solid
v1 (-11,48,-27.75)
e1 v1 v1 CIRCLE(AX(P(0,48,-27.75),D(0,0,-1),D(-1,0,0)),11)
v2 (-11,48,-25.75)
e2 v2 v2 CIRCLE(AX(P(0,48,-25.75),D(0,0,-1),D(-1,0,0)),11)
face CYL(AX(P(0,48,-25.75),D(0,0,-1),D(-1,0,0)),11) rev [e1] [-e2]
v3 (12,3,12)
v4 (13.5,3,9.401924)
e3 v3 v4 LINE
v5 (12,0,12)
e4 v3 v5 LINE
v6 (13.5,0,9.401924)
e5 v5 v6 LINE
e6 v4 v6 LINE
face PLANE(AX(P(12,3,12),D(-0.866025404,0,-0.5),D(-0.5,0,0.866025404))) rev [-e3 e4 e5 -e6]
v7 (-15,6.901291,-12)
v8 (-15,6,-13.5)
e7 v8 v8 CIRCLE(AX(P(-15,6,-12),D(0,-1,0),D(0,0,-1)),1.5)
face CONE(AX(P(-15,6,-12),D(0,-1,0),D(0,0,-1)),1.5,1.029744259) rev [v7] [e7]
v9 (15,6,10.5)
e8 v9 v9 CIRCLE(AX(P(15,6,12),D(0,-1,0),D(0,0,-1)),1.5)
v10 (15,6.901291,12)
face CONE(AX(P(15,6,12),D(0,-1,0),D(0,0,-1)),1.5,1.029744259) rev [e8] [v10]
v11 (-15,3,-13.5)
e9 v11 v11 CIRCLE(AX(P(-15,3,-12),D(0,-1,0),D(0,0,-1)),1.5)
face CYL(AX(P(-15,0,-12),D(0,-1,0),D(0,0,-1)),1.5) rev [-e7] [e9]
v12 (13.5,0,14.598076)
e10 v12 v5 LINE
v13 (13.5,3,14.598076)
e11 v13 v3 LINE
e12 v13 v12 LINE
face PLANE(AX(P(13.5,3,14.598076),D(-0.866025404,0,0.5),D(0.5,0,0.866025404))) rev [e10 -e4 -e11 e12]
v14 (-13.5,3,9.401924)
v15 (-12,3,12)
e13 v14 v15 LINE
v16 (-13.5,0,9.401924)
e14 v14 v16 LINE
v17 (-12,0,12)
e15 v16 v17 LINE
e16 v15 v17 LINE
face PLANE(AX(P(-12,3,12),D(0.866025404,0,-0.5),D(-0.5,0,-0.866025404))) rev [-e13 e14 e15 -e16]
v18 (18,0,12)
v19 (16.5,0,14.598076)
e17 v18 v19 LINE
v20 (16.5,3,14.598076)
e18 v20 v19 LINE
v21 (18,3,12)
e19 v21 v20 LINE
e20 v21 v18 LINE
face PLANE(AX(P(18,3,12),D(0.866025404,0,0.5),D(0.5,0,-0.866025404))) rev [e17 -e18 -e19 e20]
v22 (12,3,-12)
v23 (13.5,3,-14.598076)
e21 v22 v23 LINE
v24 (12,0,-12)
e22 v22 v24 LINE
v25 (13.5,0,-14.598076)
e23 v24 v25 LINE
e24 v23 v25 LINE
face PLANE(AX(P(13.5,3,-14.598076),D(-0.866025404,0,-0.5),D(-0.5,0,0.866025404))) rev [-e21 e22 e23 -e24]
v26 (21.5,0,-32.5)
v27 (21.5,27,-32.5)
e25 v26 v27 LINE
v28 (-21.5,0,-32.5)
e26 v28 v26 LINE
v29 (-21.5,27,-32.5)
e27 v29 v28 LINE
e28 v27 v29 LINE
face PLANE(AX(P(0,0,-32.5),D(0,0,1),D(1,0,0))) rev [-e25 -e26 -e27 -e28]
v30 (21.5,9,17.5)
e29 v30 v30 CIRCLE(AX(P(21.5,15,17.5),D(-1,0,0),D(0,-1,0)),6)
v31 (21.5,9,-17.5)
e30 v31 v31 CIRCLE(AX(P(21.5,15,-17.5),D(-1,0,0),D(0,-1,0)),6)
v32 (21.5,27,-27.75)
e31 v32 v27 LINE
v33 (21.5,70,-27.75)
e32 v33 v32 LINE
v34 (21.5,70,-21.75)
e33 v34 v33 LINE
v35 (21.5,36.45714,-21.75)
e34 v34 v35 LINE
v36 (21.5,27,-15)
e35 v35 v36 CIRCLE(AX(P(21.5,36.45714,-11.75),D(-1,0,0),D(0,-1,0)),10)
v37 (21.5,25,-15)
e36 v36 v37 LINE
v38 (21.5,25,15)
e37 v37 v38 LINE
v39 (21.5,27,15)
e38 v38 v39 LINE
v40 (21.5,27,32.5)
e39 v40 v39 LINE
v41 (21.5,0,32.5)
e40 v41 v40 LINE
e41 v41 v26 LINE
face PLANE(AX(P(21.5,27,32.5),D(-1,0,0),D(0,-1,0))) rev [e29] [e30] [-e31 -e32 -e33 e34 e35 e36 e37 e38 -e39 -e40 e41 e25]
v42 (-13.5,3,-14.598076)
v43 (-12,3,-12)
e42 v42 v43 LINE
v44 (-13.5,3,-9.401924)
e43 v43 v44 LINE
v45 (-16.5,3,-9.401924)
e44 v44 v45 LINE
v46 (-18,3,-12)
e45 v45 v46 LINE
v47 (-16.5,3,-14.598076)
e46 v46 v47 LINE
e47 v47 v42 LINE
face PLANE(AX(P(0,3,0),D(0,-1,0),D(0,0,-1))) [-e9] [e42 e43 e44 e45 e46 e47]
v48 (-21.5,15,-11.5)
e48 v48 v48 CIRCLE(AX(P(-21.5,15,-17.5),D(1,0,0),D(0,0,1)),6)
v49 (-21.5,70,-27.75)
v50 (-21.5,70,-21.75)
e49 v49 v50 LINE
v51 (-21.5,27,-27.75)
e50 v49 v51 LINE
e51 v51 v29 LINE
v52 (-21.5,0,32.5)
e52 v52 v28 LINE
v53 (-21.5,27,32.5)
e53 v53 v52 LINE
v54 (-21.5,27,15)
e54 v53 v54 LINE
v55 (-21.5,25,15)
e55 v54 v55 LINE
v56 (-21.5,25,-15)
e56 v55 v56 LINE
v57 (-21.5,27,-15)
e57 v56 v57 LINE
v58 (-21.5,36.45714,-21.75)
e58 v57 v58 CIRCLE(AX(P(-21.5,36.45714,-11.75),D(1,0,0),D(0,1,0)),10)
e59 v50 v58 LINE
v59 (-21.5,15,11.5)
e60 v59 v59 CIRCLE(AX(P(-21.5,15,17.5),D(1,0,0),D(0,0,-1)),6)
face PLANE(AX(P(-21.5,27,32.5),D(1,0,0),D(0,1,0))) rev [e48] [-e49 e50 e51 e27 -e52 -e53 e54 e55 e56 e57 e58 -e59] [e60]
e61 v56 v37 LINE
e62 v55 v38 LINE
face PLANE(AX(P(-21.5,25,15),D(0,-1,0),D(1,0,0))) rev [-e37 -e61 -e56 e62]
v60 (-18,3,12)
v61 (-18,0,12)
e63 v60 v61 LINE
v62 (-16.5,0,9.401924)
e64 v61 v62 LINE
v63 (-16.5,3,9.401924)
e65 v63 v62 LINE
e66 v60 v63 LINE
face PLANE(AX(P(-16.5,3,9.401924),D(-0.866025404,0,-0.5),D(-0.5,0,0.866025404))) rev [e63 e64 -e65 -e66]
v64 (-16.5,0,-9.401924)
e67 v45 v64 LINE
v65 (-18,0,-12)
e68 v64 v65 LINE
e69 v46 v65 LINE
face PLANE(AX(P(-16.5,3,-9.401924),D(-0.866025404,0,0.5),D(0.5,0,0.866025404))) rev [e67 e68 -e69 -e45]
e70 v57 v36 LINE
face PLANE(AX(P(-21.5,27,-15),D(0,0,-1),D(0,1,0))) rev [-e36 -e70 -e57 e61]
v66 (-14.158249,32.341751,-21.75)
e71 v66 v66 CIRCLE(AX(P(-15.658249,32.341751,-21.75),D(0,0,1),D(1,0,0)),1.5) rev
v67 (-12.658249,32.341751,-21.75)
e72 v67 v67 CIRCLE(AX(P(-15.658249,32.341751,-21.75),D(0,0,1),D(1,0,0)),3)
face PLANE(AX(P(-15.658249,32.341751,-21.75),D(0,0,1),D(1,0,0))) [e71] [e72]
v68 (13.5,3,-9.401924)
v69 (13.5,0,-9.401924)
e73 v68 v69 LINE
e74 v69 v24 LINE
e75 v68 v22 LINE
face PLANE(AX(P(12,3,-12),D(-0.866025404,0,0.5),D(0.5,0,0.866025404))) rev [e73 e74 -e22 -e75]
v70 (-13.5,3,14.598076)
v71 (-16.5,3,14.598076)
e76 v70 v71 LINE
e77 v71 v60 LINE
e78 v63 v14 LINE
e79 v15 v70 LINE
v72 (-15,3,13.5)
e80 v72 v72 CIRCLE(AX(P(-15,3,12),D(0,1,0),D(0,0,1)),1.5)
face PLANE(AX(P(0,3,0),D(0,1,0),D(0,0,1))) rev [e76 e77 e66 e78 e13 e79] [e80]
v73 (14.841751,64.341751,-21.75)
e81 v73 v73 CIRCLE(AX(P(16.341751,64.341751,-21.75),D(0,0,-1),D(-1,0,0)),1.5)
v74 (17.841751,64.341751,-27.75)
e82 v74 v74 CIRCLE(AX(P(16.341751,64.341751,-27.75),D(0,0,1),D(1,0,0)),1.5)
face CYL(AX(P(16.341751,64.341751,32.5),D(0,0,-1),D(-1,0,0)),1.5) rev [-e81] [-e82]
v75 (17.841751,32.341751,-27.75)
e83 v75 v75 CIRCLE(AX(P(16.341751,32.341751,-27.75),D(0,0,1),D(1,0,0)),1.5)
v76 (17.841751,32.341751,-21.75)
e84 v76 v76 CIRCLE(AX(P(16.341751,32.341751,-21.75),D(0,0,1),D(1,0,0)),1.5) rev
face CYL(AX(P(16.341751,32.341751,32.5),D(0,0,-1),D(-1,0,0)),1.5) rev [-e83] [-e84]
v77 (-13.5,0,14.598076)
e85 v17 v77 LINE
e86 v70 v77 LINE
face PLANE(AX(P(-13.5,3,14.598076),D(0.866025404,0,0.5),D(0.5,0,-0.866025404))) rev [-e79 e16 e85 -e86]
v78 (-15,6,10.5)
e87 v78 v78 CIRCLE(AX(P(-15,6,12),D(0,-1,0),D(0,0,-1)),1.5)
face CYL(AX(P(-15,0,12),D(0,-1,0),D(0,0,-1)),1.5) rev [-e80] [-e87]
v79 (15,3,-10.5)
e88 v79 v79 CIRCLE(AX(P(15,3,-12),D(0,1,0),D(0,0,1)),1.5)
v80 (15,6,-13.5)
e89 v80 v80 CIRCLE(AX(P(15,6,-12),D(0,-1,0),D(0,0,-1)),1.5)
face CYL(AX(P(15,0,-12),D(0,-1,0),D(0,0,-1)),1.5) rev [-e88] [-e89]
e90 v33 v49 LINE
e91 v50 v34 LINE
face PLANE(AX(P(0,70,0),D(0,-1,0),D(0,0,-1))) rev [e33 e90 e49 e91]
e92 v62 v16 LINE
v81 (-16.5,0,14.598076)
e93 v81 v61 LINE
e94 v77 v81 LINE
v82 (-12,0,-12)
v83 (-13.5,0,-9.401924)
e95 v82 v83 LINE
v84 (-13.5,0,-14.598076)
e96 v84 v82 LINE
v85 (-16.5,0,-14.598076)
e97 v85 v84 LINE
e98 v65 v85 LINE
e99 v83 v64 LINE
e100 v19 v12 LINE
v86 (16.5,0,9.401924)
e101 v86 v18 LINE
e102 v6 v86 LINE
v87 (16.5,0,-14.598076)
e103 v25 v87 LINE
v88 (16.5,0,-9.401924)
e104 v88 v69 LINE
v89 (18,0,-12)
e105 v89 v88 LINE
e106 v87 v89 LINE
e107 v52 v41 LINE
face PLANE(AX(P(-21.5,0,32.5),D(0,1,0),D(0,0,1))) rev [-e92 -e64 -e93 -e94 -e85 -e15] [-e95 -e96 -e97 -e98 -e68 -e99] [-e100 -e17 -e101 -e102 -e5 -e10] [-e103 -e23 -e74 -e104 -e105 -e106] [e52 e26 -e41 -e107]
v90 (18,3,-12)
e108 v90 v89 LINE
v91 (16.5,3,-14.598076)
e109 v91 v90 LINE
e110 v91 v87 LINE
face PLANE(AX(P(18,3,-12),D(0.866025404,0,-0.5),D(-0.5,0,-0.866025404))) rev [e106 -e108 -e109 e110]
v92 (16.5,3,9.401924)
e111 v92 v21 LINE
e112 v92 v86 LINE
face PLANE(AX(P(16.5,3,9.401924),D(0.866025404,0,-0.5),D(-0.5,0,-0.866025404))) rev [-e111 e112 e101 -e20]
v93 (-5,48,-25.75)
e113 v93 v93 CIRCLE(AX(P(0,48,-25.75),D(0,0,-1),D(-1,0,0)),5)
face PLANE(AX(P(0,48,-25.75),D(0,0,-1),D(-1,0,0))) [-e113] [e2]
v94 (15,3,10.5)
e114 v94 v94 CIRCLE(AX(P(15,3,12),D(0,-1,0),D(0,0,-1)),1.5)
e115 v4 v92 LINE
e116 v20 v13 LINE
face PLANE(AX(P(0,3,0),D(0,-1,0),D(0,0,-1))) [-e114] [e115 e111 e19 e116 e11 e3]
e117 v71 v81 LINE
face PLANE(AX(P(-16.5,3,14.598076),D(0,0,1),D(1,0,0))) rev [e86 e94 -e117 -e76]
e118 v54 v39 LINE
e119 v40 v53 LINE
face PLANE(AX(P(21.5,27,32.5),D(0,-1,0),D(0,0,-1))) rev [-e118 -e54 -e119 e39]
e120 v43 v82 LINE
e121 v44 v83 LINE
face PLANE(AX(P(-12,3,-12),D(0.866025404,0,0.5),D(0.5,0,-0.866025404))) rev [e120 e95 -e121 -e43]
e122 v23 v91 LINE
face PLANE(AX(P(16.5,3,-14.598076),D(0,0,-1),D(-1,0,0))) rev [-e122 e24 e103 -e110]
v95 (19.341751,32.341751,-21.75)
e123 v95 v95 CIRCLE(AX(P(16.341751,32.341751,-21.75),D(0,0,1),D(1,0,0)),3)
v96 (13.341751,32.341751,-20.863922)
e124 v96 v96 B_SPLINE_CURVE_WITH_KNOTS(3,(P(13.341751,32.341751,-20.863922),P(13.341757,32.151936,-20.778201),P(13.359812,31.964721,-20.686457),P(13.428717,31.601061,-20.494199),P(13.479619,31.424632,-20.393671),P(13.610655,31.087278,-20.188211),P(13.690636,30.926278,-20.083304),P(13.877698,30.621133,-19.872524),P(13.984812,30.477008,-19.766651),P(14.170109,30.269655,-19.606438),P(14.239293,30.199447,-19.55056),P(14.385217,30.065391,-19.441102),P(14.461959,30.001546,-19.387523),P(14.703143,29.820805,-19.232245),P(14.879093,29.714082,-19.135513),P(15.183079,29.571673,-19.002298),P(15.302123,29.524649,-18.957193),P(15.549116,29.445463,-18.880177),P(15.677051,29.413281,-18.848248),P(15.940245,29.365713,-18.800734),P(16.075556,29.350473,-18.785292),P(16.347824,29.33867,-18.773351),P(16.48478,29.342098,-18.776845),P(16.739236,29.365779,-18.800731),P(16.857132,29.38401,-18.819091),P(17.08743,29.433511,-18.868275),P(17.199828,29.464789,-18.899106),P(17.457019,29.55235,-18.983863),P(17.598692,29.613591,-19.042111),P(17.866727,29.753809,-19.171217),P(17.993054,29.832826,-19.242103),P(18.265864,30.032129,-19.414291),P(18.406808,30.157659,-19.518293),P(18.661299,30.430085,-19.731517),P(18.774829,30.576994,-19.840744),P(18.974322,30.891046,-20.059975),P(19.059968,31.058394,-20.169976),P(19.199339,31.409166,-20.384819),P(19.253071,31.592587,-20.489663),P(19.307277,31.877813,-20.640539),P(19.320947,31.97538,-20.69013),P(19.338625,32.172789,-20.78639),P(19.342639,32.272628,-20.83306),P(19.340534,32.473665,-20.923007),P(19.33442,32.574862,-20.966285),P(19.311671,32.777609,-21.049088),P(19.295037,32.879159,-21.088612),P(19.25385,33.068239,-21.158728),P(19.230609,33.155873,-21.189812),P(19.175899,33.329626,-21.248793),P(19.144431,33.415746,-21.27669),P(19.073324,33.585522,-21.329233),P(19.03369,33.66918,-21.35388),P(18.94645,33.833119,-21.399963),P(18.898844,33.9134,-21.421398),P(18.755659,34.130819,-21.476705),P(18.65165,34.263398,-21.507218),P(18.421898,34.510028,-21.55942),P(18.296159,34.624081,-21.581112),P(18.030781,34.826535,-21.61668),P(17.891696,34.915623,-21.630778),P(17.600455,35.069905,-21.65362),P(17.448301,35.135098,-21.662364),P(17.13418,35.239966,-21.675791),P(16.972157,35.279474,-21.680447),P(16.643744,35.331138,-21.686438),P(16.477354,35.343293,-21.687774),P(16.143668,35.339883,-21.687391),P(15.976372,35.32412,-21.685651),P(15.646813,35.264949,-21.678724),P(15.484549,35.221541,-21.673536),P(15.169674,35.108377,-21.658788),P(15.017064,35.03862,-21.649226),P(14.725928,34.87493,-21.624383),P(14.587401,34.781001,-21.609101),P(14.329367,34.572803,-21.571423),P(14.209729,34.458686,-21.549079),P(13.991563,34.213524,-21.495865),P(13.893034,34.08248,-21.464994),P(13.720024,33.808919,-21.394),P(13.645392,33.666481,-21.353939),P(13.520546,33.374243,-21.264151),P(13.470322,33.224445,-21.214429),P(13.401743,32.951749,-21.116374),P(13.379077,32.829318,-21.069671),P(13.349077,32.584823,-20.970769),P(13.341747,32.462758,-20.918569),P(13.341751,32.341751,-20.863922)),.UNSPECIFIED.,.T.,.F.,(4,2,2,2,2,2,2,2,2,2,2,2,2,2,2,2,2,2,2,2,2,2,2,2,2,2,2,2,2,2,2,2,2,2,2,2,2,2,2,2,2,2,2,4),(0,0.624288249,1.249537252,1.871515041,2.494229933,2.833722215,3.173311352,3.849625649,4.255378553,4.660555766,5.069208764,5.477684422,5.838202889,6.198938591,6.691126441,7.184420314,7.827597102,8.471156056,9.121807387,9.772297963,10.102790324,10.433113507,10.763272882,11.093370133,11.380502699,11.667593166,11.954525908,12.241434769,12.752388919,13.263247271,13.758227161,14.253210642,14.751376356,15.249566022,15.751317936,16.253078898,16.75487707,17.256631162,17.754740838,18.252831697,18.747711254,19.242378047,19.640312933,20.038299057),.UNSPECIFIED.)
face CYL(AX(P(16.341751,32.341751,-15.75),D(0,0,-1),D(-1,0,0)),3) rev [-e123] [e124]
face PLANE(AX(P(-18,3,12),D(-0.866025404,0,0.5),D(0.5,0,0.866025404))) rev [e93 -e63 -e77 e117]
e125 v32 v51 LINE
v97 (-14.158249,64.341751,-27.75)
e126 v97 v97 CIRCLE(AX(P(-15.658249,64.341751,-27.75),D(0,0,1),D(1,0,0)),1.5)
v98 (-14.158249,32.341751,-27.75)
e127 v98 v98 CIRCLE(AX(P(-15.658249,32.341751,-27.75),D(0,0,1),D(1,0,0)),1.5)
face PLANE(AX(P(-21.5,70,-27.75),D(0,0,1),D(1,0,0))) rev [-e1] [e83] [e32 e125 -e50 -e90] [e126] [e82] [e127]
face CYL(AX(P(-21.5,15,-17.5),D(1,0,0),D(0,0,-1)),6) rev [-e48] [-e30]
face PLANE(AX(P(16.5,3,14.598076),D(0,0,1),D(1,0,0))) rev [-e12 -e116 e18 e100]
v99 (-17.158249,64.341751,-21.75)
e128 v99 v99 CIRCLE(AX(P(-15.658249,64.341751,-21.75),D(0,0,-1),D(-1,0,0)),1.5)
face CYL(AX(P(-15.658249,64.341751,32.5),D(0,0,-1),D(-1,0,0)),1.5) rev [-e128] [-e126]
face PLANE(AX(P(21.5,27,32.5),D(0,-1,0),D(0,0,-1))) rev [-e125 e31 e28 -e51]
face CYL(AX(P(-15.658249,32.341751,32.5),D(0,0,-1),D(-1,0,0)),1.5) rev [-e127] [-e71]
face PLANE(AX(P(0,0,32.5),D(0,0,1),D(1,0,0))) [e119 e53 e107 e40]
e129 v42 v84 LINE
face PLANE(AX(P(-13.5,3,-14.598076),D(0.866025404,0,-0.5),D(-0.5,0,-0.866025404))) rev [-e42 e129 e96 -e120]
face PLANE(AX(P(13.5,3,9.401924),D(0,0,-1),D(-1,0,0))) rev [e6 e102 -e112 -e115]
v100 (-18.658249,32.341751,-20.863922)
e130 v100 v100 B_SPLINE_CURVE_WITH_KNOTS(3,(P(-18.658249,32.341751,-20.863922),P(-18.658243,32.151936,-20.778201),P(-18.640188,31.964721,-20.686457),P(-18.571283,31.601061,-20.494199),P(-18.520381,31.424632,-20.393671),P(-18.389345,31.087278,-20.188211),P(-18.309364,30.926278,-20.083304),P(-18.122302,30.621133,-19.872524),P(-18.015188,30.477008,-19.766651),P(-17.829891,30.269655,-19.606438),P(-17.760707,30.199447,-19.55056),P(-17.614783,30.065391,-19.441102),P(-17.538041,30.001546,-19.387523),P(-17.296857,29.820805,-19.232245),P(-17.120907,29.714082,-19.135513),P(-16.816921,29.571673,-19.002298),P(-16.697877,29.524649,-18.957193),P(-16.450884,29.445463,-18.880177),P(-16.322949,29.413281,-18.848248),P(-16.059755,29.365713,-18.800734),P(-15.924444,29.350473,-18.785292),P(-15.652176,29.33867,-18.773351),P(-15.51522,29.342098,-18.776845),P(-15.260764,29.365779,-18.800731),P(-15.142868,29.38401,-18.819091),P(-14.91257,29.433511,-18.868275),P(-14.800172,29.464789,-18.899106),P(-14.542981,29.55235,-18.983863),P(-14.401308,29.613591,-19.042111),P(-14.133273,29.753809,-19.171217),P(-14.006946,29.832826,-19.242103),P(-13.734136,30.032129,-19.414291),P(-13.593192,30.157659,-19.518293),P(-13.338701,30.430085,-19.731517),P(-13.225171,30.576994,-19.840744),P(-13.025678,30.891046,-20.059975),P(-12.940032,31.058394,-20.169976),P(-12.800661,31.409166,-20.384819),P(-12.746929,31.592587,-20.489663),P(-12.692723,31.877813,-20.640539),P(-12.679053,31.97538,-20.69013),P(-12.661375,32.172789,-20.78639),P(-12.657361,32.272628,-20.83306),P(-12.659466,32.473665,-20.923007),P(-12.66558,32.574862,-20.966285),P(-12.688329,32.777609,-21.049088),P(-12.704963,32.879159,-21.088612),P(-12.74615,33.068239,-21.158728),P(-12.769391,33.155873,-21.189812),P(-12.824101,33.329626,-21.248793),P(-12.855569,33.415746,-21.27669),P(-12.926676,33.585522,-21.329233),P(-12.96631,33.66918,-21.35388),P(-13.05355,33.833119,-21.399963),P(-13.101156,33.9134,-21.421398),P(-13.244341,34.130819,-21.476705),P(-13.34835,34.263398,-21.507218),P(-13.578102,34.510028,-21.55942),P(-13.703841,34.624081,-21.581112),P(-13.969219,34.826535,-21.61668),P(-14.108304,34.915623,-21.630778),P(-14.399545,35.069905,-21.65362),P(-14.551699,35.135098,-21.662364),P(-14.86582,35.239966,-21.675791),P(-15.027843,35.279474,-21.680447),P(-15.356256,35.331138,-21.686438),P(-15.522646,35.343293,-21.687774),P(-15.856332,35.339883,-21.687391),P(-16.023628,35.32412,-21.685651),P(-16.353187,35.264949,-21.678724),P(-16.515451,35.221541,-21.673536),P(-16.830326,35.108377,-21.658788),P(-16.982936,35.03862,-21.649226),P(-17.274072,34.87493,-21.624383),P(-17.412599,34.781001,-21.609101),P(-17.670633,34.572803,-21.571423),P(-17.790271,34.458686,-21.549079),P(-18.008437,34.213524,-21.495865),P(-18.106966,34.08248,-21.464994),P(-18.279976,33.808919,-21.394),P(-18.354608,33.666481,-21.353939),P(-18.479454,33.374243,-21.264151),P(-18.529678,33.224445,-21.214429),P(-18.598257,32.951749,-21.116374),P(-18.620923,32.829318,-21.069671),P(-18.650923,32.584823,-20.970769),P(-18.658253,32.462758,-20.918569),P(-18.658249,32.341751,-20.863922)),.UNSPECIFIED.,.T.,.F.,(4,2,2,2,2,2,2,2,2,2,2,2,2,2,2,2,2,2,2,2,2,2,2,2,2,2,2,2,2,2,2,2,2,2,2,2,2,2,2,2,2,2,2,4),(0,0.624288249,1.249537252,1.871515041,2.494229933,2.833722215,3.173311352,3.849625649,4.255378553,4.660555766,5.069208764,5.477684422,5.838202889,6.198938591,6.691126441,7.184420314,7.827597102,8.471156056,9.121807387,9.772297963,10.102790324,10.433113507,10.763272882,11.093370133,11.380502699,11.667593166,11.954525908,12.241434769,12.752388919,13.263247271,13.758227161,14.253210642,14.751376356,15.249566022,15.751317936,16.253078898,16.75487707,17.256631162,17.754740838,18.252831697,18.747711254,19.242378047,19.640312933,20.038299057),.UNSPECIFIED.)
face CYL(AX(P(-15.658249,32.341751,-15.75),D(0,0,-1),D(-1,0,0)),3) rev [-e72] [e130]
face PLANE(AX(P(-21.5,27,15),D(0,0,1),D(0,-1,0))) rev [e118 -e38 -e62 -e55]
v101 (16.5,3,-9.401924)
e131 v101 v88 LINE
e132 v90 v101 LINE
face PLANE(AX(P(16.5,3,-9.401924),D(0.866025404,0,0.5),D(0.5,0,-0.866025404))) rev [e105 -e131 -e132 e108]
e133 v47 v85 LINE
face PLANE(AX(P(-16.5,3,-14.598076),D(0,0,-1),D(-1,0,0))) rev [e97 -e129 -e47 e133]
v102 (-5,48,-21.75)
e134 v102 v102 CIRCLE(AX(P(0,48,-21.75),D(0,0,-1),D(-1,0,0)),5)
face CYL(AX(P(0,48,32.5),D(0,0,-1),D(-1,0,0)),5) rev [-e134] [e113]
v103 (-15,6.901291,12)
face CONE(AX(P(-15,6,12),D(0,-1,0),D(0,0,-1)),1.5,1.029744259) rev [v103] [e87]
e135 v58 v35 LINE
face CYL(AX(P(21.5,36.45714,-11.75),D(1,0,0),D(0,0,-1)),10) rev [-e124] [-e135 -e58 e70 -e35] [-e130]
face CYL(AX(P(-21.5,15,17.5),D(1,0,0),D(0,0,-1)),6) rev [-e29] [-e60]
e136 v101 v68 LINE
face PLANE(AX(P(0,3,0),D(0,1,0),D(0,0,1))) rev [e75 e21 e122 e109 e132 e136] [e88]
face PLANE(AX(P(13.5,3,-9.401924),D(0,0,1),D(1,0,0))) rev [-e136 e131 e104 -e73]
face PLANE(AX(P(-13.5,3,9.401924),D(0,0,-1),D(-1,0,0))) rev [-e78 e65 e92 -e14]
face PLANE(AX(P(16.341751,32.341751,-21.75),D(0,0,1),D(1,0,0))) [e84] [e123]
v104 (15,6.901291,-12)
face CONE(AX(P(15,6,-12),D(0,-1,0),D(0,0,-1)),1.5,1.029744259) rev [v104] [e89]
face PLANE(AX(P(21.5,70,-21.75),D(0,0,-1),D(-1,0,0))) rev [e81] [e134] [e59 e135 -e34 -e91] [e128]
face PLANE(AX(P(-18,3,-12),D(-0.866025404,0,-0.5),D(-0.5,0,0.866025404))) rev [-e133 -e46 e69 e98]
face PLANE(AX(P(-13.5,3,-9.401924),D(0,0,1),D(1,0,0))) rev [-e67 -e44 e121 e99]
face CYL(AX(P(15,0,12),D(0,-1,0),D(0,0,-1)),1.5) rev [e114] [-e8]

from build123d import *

# Parameters (mm, degrees)
SKETCH9_W                 = 43
SKETCH9_H                 = 27
BOSS_EXTRUDE1_DEPTH       = 32.5
CUT_EXTRUDE1_DEPTH        = 61.284741021
CUT_EXTRUDE1_DEPTH_BACK   = 61.284741021
SKETCH10_R                = 6
CUT_EXTRUDE2_DEPTH        = 3
CUT_EXTRUDE4_DEPTH        = 61.284741021
CUT_EXTRUDE4_DEPTH_BACK   = 61.284741021
SKETCH14_W                = 30
SKETCH14_H                = 2
SKETCH15_W                = 43
SKETCH15_H                = 6
BOSS_EXTRUDE2_DEPTH       = 43
F_3_0MM_DOWEL_HOLE1_D     = 3
F_3_0MM_DOWEL_HOLE1_DEPTH = 6
F_3_0MM_DOWEL_HOLE1_TIP   = 0.901290929
FILLET2_R                 = 10
SKETCH20_R                = 11
CUT_EXTRUDE5_DEPTH        = 2
CUT_EXTRUDE6_DEPTH        = 95.827804467
CUT_EXTRUDE6_DEPTH_BACK   = 95.827804467
SKETCH21_R                = 5
SKETCH21_R_2              = 1.5
SKETCH23_R                = 3
CUT_EXTRUDE7_DEPTH        = 6


with BuildPart() as part:
    # Sketch9 → Boss-Extrude1 (new, symmetric)
    with BuildSketch(Plane.XY):
        with Locations((0, 13.5)):
            Rectangle(SKETCH9_W, SKETCH9_H)
    extrude(amount=BOSS_EXTRUDE1_DEPTH, both=True)

    # Sketch10 → Cut-Extrude1 (cut, two sides: drawn at the far end of the back side and taken through both)
    with BuildSketch(Plane(origin=(21.5, 0, 0), x_dir=(0, 0, -1), z_dir=(1, 0, 0)).offset(-CUT_EXTRUDE1_DEPTH_BACK)):
        with Locations((-17.5, 15)):
            Circle(SKETCH10_R)
        with Locations(Location((17.5, 15, 0), (0, 0, 270))):
            Circle(SKETCH10_R)
    extrude(amount=CUT_EXTRUDE1_DEPTH + CUT_EXTRUDE1_DEPTH_BACK, mode=Mode.SUBTRACT)

    # Sketch11 → Cut-Extrude2 (cut)
    with BuildSketch(Plane.XZ):
        Polygon((12, -12), (13.5, -9.401923789), (16.5, -9.401923789), (18, -12), (16.5, -14.598076211), (13.5, -14.598076211), align=None)
        Polygon((13.5, 9.401923789), (16.5, 9.401923789), (18, 12), (16.5, 14.598076211), (13.5, 14.598076211), (12, 12), align=None)
        Polygon((-13.5, -9.401923789), (-16.5, -9.401923789), (-18, -12), (-16.5, -14.598076211), (-13.5, -14.598076211), (-12, -12), align=None)
        Polygon((-12, 12), (-13.5, 9.401923789), (-16.5, 9.401923789), (-18, 12), (-16.5, 14.598076211), (-13.5, 14.598076211), align=None)
    extrude(amount=-CUT_EXTRUDE2_DEPTH, mode=Mode.SUBTRACT)

    # Sketch14 → Cut-Extrude4 (cut, two sides: drawn at the far end of the back side and taken through both)
    with BuildSketch(Plane(origin=(21.5, 0, 0), x_dir=(0, 0, -1), z_dir=(1, 0, 0)).offset(-CUT_EXTRUDE4_DEPTH_BACK)):
        with Locations((0, 26)):
            Rectangle(SKETCH14_W, SKETCH14_H)
    extrude(amount=CUT_EXTRUDE4_DEPTH + CUT_EXTRUDE4_DEPTH_BACK, mode=Mode.SUBTRACT)

    # Sketch15 → Boss-Extrude2 (add)
    with BuildSketch(Plane(origin=(0, 27, 0), x_dir=(1, 0, 0), z_dir=(0, 1, 0))):
        with Locations((0, 24.75)):
            Rectangle(SKETCH15_W, SKETCH15_H)
    extrude(amount=BOSS_EXTRUDE2_DEPTH)

    # Ø3.0mm Dowel Hole1
    with Locations(Plane(origin=(15, 0, 12), x_dir=(0, 0, -1), z_dir=(0, -1, 0))):
        with Locations((0, 0), (0, -30), (24, -30), (24, 0)):
            Hole(F_3_0MM_DOWEL_HOLE1_D / 2, depth=F_3_0MM_DOWEL_HOLE1_DEPTH)
            with Locations((0, 0, -(F_3_0MM_DOWEL_HOLE1_DEPTH + F_3_0MM_DOWEL_HOLE1_TIP / 2))):  # 118° drill point
                Cone(0, F_3_0MM_DOWEL_HOLE1_D / 2, F_3_0MM_DOWEL_HOLE1_TIP, mode=Mode.SUBTRACT)

    # Fillet2
    # the kernel refuses this fillet: 10 mm, written as the material it adds along each edge
    with BuildSketch(Plane(origin=(21.5, 27, -21.75), x_dir=(0, 0, 1), z_dir=(-1, 0, 0))) as fillet2_piece_1:
        with BuildLine():
            CenterArc((10, 9.45714016), FILLET2_R, 180, 71.034425011)
            Line((0, 9.45714016), (-0.2, 9.45714016))
            Line((-0.2, 9.45714016), (-0.2, 0))
            Line((-0.2, 0), (0, -0.2))
            ThreePointArc((0, -0.2), (3.375, -0.2), (6.685, -0.189142803))
            Line((6.685, -0.189142803), (6.75, 0))
        make_face()
    extrude(amount=43)

    # Sketch20 → Cut-Extrude5 (cut)
    with BuildSketch(Plane(origin=(0, 0, -27.75), x_dir=(-1, 0, 0), z_dir=(0, 0, -1))):
        with Locations((0, 48)):
            Circle(SKETCH20_R)
    extrude(amount=-CUT_EXTRUDE5_DEPTH, mode=Mode.SUBTRACT)

    # Sketch21 → Cut-Extrude6 (cut, two sides: drawn at the far end of the back side and taken through both)
    with BuildSketch(Plane(origin=(0, 0, -27.75), x_dir=(-1, 0, 0), z_dir=(0, 0, -1)).offset(-CUT_EXTRUDE6_DEPTH_BACK)):
        with Locations((0, 48)):
            Circle(SKETCH21_R)
        with Locations((-16.341750707, 64.341750707)):
            Circle(SKETCH21_R_2)
        with Locations((15.658249293, 64.341750707)):
            Circle(SKETCH21_R_2)
        with Locations((15.658249293, 32.341750707)):
            Circle(SKETCH21_R_2)
        with Locations((-16.341750707, 32.341750707)):
            Circle(SKETCH21_R_2)
    extrude(amount=CUT_EXTRUDE6_DEPTH + CUT_EXTRUDE6_DEPTH_BACK, mode=Mode.SUBTRACT)

    # Sketch23 → Cut-Extrude7 (cut)
    with BuildSketch(Plane.XY.offset(-21.75)):
        with Locations(Location((-15.658249293, 32.341750707, 0), (0, 0, 180))):
            Circle(SKETCH23_R)
        with Locations(Location((16.341750707, 32.341750707, 0), (0, 0, 180))):
            Circle(SKETCH23_R)
    extrude(amount=CUT_EXTRUDE7_DEPTH, mode=Mode.SUBTRACT)


solid = part.part
